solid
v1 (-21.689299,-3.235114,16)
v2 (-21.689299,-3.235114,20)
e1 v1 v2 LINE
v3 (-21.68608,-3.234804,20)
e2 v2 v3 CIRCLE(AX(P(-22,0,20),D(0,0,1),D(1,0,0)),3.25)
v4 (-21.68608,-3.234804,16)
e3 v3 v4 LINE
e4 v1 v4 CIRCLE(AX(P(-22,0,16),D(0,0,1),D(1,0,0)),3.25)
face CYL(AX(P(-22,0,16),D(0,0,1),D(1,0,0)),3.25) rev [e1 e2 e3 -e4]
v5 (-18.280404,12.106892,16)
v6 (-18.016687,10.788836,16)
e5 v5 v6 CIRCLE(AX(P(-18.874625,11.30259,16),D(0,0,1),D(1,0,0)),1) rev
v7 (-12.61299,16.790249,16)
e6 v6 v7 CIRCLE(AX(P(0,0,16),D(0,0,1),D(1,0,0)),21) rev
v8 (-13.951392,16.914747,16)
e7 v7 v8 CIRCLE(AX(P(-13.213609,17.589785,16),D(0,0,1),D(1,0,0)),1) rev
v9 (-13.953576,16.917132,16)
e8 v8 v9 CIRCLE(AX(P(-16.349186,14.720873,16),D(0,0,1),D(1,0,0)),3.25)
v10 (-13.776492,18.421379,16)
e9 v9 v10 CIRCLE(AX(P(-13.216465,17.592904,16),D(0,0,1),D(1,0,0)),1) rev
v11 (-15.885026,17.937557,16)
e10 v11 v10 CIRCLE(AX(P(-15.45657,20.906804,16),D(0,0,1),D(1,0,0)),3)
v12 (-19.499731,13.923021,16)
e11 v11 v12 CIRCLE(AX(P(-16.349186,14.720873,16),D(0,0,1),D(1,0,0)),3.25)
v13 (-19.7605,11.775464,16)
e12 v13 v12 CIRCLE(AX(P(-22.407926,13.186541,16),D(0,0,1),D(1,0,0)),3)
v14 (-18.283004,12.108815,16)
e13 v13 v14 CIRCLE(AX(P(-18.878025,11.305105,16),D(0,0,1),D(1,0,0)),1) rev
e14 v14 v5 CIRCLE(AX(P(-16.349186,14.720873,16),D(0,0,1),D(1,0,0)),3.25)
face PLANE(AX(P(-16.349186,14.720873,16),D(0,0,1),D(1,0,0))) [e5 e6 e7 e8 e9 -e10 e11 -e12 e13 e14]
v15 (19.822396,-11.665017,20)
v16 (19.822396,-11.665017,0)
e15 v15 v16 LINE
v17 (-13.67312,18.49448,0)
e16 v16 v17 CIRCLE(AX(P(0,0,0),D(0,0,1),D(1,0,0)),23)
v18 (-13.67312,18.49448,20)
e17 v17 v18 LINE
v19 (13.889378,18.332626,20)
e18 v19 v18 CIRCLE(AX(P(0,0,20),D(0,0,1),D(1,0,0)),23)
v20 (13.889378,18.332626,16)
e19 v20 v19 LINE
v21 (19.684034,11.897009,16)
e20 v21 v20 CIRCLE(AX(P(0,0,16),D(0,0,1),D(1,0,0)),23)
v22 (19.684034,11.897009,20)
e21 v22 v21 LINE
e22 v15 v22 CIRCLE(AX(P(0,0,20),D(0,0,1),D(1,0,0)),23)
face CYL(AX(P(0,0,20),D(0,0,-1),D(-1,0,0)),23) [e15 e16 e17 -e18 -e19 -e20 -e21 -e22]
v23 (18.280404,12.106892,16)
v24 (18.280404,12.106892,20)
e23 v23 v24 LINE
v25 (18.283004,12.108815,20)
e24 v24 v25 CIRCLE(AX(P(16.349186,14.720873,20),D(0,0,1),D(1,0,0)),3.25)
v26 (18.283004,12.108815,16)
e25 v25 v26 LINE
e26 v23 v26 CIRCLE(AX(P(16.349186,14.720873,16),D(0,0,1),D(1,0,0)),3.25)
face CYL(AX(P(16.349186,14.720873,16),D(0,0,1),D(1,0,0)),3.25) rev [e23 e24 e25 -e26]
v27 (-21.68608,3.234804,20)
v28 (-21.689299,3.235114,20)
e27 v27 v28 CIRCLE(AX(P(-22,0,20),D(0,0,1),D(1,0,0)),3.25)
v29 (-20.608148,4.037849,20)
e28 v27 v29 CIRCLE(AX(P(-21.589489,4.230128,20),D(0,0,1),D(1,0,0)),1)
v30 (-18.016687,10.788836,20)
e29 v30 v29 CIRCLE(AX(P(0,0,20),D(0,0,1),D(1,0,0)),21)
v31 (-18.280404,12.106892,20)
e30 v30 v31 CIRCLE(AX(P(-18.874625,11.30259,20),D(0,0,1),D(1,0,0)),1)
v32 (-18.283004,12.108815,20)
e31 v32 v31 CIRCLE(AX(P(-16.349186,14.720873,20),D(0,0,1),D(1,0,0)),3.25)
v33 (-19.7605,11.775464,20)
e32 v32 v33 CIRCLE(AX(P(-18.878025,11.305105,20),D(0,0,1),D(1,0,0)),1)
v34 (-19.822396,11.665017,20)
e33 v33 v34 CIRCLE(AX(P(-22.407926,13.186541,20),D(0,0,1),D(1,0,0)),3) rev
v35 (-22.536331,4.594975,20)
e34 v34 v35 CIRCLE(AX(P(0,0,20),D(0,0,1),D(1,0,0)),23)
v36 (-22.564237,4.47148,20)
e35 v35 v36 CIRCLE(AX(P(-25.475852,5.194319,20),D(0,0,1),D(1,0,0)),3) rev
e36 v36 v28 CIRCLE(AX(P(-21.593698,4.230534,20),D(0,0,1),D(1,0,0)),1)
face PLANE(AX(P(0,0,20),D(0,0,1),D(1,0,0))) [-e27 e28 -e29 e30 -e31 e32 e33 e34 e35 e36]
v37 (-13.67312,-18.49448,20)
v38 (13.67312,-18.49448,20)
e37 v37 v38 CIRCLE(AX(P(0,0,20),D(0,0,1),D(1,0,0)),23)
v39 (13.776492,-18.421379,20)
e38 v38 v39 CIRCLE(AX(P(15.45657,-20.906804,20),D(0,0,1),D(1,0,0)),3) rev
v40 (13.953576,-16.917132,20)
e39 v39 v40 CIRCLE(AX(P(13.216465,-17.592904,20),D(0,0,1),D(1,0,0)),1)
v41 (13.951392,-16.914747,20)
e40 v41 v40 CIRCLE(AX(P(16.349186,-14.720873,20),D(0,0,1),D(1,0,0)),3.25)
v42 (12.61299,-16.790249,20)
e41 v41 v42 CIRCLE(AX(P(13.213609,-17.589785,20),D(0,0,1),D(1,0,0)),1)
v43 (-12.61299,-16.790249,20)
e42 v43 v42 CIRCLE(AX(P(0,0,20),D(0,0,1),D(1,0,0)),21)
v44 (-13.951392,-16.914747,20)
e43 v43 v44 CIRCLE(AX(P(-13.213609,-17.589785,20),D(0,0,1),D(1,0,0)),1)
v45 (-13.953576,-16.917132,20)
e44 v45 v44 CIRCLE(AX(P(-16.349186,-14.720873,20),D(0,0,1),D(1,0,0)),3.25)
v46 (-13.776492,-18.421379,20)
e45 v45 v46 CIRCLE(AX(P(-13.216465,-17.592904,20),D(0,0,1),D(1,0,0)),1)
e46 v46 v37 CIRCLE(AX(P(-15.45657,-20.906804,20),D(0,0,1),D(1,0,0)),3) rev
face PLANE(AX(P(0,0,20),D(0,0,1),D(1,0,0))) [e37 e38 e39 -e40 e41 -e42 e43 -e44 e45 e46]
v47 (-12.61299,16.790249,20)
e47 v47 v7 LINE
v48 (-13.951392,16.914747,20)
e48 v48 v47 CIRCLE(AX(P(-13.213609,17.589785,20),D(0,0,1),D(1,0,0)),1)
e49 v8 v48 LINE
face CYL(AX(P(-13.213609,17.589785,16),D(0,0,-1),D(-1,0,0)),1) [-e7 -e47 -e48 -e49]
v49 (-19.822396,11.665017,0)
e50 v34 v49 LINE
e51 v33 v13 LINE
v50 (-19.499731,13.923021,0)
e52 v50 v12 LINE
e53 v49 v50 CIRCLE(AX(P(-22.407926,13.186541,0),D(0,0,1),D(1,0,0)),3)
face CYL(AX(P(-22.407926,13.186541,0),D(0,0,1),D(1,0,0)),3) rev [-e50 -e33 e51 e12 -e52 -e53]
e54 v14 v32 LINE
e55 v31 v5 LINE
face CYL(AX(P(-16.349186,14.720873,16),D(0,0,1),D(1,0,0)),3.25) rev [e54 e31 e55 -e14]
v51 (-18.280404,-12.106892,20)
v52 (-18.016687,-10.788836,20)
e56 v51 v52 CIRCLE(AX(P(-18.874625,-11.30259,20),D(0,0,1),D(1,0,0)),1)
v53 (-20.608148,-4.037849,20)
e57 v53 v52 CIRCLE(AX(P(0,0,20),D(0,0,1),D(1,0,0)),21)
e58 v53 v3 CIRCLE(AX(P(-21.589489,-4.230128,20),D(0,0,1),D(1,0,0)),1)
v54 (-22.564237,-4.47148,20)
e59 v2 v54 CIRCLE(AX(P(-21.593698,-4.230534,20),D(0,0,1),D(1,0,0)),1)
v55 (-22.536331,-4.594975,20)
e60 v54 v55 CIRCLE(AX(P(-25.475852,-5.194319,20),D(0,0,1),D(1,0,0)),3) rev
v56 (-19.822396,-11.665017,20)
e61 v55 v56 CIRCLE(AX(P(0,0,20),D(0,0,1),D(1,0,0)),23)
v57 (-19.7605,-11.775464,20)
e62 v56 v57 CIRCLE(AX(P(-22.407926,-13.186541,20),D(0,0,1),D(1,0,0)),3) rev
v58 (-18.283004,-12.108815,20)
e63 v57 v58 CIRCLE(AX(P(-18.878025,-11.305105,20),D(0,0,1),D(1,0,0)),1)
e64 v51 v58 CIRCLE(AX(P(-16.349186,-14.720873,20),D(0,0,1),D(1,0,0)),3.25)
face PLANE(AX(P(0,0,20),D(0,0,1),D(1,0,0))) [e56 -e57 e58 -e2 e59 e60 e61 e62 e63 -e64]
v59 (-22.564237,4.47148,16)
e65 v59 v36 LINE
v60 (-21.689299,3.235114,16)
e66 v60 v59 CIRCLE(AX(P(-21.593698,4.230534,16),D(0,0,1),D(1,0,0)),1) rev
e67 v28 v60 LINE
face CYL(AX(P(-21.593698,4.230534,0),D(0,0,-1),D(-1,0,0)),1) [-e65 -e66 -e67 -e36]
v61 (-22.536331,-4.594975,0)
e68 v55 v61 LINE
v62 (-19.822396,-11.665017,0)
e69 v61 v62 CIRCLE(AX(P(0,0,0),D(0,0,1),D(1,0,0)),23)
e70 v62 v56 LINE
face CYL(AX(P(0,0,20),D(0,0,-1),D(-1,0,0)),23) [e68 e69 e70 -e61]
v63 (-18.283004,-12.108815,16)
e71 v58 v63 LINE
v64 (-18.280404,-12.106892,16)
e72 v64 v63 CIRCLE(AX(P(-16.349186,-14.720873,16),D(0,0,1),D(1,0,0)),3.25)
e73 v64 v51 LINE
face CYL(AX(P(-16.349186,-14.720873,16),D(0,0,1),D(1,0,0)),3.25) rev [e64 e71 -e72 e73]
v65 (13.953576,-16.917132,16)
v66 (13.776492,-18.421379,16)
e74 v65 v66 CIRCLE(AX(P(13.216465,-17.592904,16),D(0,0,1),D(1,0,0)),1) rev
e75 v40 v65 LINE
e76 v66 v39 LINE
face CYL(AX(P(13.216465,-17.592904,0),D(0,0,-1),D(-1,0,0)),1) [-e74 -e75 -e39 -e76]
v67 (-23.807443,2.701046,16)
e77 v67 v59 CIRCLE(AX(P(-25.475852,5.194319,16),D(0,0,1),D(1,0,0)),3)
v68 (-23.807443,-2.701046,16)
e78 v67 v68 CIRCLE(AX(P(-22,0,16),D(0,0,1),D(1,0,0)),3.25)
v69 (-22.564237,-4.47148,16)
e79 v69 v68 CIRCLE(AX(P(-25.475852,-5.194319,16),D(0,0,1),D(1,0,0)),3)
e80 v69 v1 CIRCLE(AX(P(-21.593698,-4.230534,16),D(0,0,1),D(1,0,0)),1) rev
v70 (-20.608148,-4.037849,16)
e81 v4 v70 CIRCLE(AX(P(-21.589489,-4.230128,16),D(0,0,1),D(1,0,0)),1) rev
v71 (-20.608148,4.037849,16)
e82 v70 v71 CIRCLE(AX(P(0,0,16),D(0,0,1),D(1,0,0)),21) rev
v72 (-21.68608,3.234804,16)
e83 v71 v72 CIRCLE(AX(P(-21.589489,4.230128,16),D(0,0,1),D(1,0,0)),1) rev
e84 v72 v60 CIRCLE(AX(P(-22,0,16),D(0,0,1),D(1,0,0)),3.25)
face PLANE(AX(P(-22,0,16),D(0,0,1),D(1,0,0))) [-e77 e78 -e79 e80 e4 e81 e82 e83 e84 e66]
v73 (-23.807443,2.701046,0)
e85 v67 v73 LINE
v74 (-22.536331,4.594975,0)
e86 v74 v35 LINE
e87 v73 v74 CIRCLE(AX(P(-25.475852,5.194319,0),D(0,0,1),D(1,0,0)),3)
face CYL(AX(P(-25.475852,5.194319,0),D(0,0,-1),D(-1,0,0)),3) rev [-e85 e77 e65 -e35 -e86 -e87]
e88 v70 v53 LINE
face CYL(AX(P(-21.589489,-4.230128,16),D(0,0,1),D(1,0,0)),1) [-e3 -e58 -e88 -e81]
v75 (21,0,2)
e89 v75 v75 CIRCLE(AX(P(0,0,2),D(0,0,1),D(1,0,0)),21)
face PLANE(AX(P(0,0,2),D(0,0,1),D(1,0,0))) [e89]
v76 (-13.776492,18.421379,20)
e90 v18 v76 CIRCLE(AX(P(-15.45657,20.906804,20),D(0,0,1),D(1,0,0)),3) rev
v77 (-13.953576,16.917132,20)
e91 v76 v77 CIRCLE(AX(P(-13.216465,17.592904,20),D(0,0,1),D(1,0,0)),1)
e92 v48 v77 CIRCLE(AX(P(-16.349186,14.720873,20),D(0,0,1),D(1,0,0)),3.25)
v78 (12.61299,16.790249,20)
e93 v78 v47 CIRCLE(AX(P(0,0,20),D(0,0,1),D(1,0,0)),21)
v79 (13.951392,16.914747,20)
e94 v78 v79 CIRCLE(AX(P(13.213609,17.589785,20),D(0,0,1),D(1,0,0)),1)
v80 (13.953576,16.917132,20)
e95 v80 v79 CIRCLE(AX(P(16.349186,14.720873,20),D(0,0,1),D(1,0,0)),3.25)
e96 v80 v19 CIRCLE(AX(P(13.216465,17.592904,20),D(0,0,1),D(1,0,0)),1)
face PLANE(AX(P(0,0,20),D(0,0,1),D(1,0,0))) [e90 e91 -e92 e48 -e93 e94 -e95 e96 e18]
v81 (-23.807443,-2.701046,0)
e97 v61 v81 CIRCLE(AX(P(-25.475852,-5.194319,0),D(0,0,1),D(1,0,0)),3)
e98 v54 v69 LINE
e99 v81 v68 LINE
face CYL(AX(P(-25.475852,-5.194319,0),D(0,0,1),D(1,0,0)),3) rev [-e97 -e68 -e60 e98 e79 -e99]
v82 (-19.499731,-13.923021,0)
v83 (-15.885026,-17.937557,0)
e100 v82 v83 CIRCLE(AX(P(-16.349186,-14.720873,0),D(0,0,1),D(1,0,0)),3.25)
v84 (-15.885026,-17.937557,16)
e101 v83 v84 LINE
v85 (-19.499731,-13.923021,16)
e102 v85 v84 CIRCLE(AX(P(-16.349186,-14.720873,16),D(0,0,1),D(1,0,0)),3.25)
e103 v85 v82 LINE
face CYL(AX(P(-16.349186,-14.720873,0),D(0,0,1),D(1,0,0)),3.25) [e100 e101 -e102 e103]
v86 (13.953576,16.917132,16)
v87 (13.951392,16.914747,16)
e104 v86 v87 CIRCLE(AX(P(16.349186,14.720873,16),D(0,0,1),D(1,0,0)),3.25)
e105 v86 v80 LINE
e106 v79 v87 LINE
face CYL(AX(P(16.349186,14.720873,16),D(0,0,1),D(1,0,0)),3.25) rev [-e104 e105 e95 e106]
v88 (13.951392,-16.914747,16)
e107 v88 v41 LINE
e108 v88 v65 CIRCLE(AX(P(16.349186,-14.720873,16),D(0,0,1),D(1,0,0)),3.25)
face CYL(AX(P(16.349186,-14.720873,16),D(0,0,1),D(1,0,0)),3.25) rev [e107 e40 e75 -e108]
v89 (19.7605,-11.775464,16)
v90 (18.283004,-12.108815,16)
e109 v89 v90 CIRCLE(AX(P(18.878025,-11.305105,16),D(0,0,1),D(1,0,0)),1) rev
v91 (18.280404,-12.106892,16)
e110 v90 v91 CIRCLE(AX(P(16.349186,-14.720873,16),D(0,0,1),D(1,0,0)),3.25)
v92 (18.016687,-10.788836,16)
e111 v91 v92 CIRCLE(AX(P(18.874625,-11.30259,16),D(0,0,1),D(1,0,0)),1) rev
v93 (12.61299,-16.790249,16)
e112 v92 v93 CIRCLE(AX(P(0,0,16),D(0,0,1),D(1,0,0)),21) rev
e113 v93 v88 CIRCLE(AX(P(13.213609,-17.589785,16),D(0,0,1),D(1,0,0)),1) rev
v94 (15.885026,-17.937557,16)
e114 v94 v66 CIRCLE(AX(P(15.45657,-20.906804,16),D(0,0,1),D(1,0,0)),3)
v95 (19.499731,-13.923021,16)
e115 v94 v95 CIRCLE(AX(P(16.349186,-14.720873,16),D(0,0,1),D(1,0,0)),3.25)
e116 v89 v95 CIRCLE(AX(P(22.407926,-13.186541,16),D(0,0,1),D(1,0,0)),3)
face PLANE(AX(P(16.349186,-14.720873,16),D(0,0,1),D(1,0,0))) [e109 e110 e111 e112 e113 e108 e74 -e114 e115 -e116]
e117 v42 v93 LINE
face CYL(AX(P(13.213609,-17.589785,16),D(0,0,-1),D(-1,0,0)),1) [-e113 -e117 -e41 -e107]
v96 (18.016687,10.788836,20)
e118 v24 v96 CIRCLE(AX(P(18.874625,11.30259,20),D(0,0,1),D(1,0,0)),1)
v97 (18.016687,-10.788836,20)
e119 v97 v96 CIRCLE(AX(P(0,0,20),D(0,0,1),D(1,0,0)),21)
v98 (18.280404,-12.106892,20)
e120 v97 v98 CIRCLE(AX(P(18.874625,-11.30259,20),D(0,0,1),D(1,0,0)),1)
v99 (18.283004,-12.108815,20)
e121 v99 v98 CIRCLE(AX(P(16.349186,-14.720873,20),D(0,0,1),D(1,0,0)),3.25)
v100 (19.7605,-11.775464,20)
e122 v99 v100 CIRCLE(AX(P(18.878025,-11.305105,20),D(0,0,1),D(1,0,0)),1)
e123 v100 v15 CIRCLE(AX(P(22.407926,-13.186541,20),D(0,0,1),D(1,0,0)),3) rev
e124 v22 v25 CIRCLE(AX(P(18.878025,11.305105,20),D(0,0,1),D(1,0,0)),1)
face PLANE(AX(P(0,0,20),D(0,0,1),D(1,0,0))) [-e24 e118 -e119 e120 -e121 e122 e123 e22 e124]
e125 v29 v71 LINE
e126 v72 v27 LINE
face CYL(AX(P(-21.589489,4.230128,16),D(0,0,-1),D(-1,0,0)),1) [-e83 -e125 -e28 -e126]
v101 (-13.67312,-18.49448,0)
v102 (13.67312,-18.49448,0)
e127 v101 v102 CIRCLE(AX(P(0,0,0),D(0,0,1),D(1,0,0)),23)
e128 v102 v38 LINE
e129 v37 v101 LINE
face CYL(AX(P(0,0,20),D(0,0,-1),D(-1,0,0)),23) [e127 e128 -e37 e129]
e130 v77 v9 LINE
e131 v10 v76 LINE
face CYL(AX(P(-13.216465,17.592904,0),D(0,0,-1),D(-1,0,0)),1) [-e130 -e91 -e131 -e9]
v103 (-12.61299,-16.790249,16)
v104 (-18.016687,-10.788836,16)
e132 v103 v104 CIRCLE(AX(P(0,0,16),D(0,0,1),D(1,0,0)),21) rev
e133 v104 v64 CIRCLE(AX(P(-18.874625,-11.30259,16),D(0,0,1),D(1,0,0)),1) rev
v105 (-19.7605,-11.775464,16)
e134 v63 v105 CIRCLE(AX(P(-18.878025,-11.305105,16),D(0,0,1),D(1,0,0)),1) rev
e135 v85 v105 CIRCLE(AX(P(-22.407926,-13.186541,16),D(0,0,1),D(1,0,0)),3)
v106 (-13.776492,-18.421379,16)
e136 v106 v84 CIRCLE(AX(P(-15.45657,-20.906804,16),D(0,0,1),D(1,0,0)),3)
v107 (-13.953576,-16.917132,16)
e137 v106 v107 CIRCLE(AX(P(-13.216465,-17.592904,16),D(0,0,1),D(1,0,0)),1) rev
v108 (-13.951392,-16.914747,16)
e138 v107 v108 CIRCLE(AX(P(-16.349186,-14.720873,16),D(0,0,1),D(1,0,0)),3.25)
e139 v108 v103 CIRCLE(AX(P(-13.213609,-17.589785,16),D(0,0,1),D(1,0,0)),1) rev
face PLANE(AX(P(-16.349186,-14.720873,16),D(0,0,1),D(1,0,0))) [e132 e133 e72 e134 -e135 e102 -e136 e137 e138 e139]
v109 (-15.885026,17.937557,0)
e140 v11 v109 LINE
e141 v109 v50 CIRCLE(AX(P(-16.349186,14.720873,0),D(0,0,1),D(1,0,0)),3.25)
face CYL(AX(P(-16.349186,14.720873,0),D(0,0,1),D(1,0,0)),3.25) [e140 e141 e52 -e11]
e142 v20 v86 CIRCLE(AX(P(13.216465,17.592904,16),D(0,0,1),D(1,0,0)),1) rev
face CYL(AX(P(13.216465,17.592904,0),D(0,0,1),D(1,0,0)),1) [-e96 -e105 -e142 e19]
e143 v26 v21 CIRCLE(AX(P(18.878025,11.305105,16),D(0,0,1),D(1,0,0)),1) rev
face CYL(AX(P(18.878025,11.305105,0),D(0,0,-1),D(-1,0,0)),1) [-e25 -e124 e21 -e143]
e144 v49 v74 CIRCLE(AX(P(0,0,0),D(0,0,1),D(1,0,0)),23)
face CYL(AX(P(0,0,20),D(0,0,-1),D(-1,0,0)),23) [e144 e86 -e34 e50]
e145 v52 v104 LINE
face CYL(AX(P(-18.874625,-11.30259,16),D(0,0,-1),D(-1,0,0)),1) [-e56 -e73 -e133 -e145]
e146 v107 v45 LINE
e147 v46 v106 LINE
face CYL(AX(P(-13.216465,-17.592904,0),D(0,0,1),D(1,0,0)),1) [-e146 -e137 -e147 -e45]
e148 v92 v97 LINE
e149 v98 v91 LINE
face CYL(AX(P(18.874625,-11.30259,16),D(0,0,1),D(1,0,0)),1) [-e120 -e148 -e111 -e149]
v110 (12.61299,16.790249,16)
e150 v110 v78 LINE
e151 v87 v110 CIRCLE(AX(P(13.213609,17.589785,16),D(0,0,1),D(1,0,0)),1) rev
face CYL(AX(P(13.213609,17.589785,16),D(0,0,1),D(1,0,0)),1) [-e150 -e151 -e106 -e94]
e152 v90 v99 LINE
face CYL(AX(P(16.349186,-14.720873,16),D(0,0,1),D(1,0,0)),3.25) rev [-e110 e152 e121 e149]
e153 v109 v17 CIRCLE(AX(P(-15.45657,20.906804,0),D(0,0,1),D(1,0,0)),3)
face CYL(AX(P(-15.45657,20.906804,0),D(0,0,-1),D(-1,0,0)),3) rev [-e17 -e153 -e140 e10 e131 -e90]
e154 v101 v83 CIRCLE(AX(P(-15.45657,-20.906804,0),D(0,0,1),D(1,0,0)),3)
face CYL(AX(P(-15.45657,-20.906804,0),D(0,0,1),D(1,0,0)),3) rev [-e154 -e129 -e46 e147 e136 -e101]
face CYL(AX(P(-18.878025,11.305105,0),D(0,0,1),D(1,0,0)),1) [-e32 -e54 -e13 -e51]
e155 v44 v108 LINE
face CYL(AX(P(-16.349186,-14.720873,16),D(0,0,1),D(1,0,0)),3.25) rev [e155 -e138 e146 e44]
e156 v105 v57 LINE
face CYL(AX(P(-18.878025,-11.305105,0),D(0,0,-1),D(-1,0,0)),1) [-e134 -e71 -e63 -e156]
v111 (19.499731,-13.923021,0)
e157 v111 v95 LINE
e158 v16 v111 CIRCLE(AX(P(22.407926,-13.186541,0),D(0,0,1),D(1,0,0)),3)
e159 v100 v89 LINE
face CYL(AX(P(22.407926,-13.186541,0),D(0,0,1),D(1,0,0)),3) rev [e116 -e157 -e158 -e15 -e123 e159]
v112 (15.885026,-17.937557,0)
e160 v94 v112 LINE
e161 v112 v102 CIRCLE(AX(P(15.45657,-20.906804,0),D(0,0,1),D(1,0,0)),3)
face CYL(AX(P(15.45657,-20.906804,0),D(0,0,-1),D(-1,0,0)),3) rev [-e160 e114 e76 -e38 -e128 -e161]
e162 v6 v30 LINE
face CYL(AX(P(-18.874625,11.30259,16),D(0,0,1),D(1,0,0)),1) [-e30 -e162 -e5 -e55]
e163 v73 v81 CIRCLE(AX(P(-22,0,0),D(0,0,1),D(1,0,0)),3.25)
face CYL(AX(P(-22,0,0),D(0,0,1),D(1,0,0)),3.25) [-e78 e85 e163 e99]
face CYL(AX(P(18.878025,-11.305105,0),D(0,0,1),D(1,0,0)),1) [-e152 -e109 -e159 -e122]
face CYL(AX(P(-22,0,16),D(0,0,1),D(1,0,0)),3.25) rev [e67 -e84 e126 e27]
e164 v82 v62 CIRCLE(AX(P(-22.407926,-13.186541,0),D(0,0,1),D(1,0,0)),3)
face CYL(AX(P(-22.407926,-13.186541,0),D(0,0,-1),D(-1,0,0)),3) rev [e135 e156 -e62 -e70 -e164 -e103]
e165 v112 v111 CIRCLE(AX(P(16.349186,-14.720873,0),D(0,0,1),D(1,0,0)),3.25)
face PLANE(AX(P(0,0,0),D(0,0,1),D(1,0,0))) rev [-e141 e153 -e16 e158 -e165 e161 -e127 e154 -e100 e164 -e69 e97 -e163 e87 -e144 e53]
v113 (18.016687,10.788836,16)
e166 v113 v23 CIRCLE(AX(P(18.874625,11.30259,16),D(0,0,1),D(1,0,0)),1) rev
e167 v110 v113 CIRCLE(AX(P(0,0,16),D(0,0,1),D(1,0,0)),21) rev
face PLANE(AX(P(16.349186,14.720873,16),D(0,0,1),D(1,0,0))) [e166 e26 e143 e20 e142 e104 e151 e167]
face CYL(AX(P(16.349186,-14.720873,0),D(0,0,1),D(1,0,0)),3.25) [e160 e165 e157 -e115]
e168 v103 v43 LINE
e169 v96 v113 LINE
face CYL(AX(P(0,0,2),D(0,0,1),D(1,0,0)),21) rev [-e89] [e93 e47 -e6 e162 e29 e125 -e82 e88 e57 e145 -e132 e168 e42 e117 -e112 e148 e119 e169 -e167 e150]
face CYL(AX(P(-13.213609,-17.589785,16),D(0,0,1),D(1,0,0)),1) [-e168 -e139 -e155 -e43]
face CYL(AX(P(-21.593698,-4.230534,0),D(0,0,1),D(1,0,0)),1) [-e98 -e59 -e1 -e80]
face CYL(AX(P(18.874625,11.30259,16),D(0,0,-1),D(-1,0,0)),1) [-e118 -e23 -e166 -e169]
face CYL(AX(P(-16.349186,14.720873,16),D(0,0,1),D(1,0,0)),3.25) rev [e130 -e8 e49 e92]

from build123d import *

# Parameters (mm, degrees)
SKETCH_1_R          = 23
EXTRUDE_1_DEPTH     = 20
SKETCH_2_R          = 21
CUT_EXTRUDE_1_DEPTH = 18
EXTRUDE_START       = -20
EXTRUDE_2_DEPTH     = 20
FILLET_1_R          = 3
SKETCH_6_R          = 21
CUT_EXTRUDE_2_DEPTH = 18
CUT_EXTRUDE_START   = -4
SKETCH_7_R          = 3.25
CUT_EXTRUDE_3_DEPTH = 4
FILLET_START        = 16
FILLET_2_DEPTH      = 4
CUT_EXTRUDE_4_REACH = 41.58


with BuildPart() as part:
    # Эскиз1 → Бобышка-Вытянуть1 (new body)
    with BuildSketch(Plane.XY):
        Circle(SKETCH_1_R)
    extrude(amount=EXTRUDE_1_DEPTH)

    # Эскиз2 → Вырез-Вытянуть1 (cut)
    with BuildSketch(Plane.XY.offset(20)):
        Circle(SKETCH_2_R)
    extrude(amount=-CUT_EXTRUDE_1_DEPTH, mode=Mode.SUBTRACT)

    # Эскиз5 → Бобышка-Вытянуть2 (add)
    with BuildSketch(Plane.XY.offset(20).offset(EXTRUDE_START)):
        with BuildLine():
            ThreePointArc((-13.428172595, 16.145717103), (-18.764406843, 16.895547811), (-17.460895421, 11.666924663))
            ThreePointArc((-17.460895421, 11.666924663), (-19.605188956, 7.52572694), (-20.782670455, 3.013404848))
            ThreePointArc((-20.782670455, 3.013404848), (-25.25, 0), (-20.782670455, -3.013404848))
            ThreePointArc((-20.782670455, -3.013404848), (-19.605188956, -7.52572694), (-17.460895421, -11.666924663))
            ThreePointArc((-17.460895421, -11.666924663), (-18.764406843, -16.895547811), (-13.428172595, -16.145717103))
            ThreePointArc((-13.428172595, -16.145717103), (0, -21), (13.428172595, -16.145717103))
            ThreePointArc((13.428172595, -16.145717103), (18.764406843, -16.895547811), (17.460895421, -11.666924663))
            ThreePointArc((17.460895421, -11.666924663), (21, 0), (17.460895421, 11.666924663))
            ThreePointArc((17.460895421, 11.666924663), (18.764406843, 16.895547811), (13.428172595, 16.145717103))
            ThreePointArc((13.428172595, 16.145717103), (0, 21), (-13.428172595, 16.145717103))
        make_face()
    extrude(amount=EXTRUDE_2_DEPTH)

    # Скругление1
    fillet_1_edges = [part.edges().sort_by_distance(p)[0] for p in [
        (19.041496109, 12.900442858, 10),
        (14.820151209, -17.588721334, 10),
        (-19.041496109, -12.900442858, 10),
        (-22.782670455, 3.154350481, 10),
        (-14.820151209, 17.588721334, 10),
        (14.820151209, 17.588721334, 10),
        (19.041496109, -12.900442858, 10),
        (-14.820151209, -17.588721334, 10),
        (-22.782670455, -3.154350481, 10),
        (-19.041496109, 12.900442858, 10),
    ]]
    fillet(fillet_1_edges, radius=FILLET_1_R)

    # Эскиз6 → Вырез-Вытянуть2 (cut)
    with BuildSketch(Plane.XY.offset(20)):
        Circle(SKETCH_6_R)
    extrude(amount=-CUT_EXTRUDE_2_DEPTH, mode=Mode.SUBTRACT)

    # Эскиз7 → Вырез-Вытянуть3 (cut)
    with BuildSketch(Plane.XY.offset(20).offset(CUT_EXTRUDE_START)):
        with Locations((-16.349186161, 14.72087334)):
            Circle(SKETCH_7_R)
        with Locations((16.349186161, 14.72087334)):
            Circle(SKETCH_7_R)
        with Locations((-16.349186161, -14.72087334)):
            Circle(SKETCH_7_R)
        with Locations((-22, 0)):
            Circle(SKETCH_7_R)
        with Locations((16.349186161, -14.72087334)):
            Circle(SKETCH_7_R)
    extrude(amount=CUT_EXTRUDE_3_DEPTH, mode=Mode.SUBTRACT)

    # Скругление2: read off the stored shape, not the designer's step
    # Скругление2 outline → Скругление2 (cut)
    with BuildSketch(Plane.XY.offset(FILLET_START)):
        with BuildLine():
            ThreePointArc((-13.776491508, -18.421379011), (-14.209607213, -17.709819826), (-13.95357615, -16.917132131))
            ThreePointArc((-13.95357615, -16.917132131), (-14.831000199, -17.59447933), (-15.885025704, -17.937557202))
            ThreePointArc((-15.885025704, -17.937557202), (-14.785629767, -17.982793014), (-13.776491508, -18.421379011))
        make_face()
        with BuildLine():
            ThreePointArc((-19.499730713, -13.923020582), (-19.048356591, -12.910630542), (-18.283004183, -12.108815175))
            ThreePointArc((-18.283004183, -12.108815175), (-19.098111986, -12.280585247), (-19.760500256, -11.775464006))
            ThreePointArc((-19.760500256, -11.775464006), (-19.42980055, -12.824918821), (-19.499730713, -13.923020582))
        make_face()
        with BuildLine():
            ThreePointArc((-22.564236885, -4.471480374), (-22.409978551, -3.652877874), (-21.689298793, -3.235114335))
            ThreePointArc((-21.689298793, -3.235114335), (-22.794585678, -3.151370115), (-23.807443182, -2.701045935))
            ThreePointArc((-23.807443182, -2.701045935), (-23.020701446, -3.470302164), (-22.564236885, -4.471480374))
        make_face()
        with BuildLine():
            ThreePointArc((-23.807443182, 2.701045935), (-22.794585678, 3.151370115), (-21.689298793, 3.235114335))
            ThreePointArc((-21.689298793, 3.235114335), (-22.409978551, 3.652877874), (-22.564236885, 4.471480374))
            ThreePointArc((-22.564236885, 4.471480374), (-23.020701446, 3.470302164), (-23.807443182, 2.701045935))
        make_face()
        with BuildLine():
            ThreePointArc((-19.760500256, 11.775464006), (-19.098111986, 12.280585247), (-18.283004183, 12.108815175))
            ThreePointArc((-18.283004183, 12.108815175), (-19.048356591, 12.910630542), (-19.499730713, 13.923020582))
            ThreePointArc((-19.499730713, 13.923020582), (-19.42980055, 12.824918821), (-19.760500256, 11.775464006))
        make_face()
        with BuildLine():
            ThreePointArc((-15.885025704, 17.937557202), (-14.831000199, 17.59447933), (-13.95357615, 16.917132131))
            ThreePointArc((-13.95357615, 16.917132131), (-14.209607213, 17.709819826), (-13.776491508, 18.421379011))
            ThreePointArc((-13.776491508, 18.421379011), (-14.785629767, 17.982793014), (-15.885025704, 17.937557202))
        make_face()
        with BuildLine():
            ThreePointArc((13.776491508, 18.421379011), (14.209607213, 17.709819826), (13.95357615, 16.917132131))
            ThreePointArc((13.95357615, 16.917132131), (14.831000199, 17.59447933), (15.885025704, 17.937557202))
            ThreePointArc((15.885025704, 17.937557202), (14.785629767, 17.982793014), (13.776491508, 18.421379011))
        make_face()
        with BuildLine():
            ThreePointArc((19.499730713, 13.923020582), (19.048356591, 12.910630542), (18.283004183, 12.108815175))
            ThreePointArc((18.283004183, 12.108815175), (19.098111986, 12.280585247), (19.760500256, 11.775464006))
            ThreePointArc((19.760500256, 11.775464006), (19.42980055, 12.824918821), (19.499730713, 13.923020582))
        make_face()
        with BuildLine():
            ThreePointArc((19.760500256, -11.775464006), (19.098111986, -12.280585247), (18.283004183, -12.108815175))
            ThreePointArc((18.283004183, -12.108815175), (19.048356591, -12.910630542), (19.499730713, -13.923020582))
            ThreePointArc((19.499730713, -13.923020582), (19.42980055, -12.824918821), (19.760500256, -11.775464006))
        make_face()
        with BuildLine():
            ThreePointArc((15.885025704, -17.937557202), (14.831000199, -17.59447933), (13.95357615, -16.917132131))
            ThreePointArc((13.95357615, -16.917132131), (14.209607213, -17.709819826), (13.776491508, -18.421379011))
            ThreePointArc((13.776491508, -18.421379011), (14.785629767, -17.982793014), (15.885025704, -17.937557202))
        make_face()
        with BuildLine():
            ThreePointArc((-13.951391744, -16.914747069), (-13.306228642, -16.594083591), (-12.612990263, -16.790249451))
            ThreePointArc((-12.612990263, -16.790249451), (-13.024568946, -16.473026551), (-13.428172595, -16.145717103))
            ThreePointArc((-13.428172595, -16.145717103), (-13.662128037, -16.549046921), (-13.951391744, -16.914747069))
        make_face()
        with BuildLine():
            ThreePointArc((13.428172595, -16.145717103), (13.024568946, -16.473026551), (12.612990263, -16.790249451))
            ThreePointArc((12.612990263, -16.790249451), (13.306228642, -16.594083591), (13.951391744, -16.914747069))
            ThreePointArc((13.951391744, -16.914747069), (13.662128037, -16.549046921), (13.428172595, -16.145717103))
        make_face()
        with BuildLine():
            ThreePointArc((-18.280403854, -12.106892043), (-17.886470759, -11.857439027), (-17.460895421, -11.666924663))
            ThreePointArc((-17.460895421, -11.666924663), (-17.744223765, -11.231318844), (-18.016687197, -10.78883601))
            ThreePointArc((-18.016687197, -10.78883601), (-17.894059096, -11.498781672), (-18.280403854, -12.106892043))
        make_face()
        with BuildLine():
            ThreePointArc((18.016687197, -10.78883601), (17.744223765, -11.231318844), (17.460895421, -11.666924663))
            ThreePointArc((17.460895421, -11.666924663), (17.886470759, -11.857439027), (18.280403854, -12.106892043))
            ThreePointArc((18.280403854, -12.106892043), (17.894059096, -11.498781672), (18.016687197, -10.78883601))
        make_face()
        with BuildLine():
            ThreePointArc((-21.686079545, -3.234803541), (-20.992064177, -3.428202514), (-20.608148244, -4.037849175))
            ThreePointArc((-20.608148244, -4.037849175), (-20.701747261, -3.526706725), (-20.782670455, -3.013404848))
            ThreePointArc((-20.782670455, -3.013404848), (-21.226413556, -3.156590568), (-21.686079545, -3.234803541))
        make_face()
        with BuildLine():
            ThreePointArc((-21.686079545, 3.234803541), (-21.226413556, 3.156590568), (-20.782670455, 3.013404848))
            ThreePointArc((-20.782670455, 3.013404848), (-20.701747261, 3.526706725), (-20.608148244, 4.037849175))
            ThreePointArc((-20.608148244, 4.037849175), (-20.992064177, 3.428202514), (-21.686079545, 3.234803541))
        make_face()
        with BuildLine():
            ThreePointArc((17.460895421, 11.666924663), (17.744223765, 11.231318844), (18.016687197, 10.78883601))
            ThreePointArc((18.016687197, 10.78883601), (17.894059096, 11.498781672), (18.280403854, 12.106892043))
            ThreePointArc((18.280403854, 12.106892043), (17.886470759, 11.857439027), (17.460895421, 11.666924663))
        make_face()
        with BuildLine():
            ThreePointArc((-18.280403854, 12.106892043), (-17.894059096, 11.498781672), (-18.016687197, 10.78883601))
            ThreePointArc((-18.016687197, 10.78883601), (-17.744223765, 11.231318844), (-17.460895421, 11.666924663))
            ThreePointArc((-17.460895421, 11.666924663), (-17.886470759, 11.857439027), (-18.280403854, 12.106892043))
        make_face()
        with BuildLine():
            ThreePointArc((12.612990263, 16.790249451), (13.024568946, 16.473026551), (13.428172595, 16.145717103))
            ThreePointArc((13.428172595, 16.145717103), (13.662128037, 16.549046921), (13.951391744, 16.914747069))
            ThreePointArc((13.951391744, 16.914747069), (13.306228642, 16.594083591), (12.612990263, 16.790249451))
        make_face()
        with BuildLine():
            ThreePointArc((-13.951391744, 16.914747069), (-13.662128037, 16.549046921), (-13.428172595, 16.145717103))
            ThreePointArc((-13.428172595, 16.145717103), (-13.024568946, 16.473026551), (-12.612990263, 16.790249451))
            ThreePointArc((-12.612990263, 16.790249451), (-13.306228642, 16.594083591), (-13.951391744, 16.914747069))
        make_face()
    extrude(amount=FILLET_2_DEPTH, mode=Mode.SUBTRACT)

    # Эскиз8 → Вырез-Вытянуть4 (cut, up to next)
    with BuildSketch(Plane(origin=(0, 0, 0), x_dir=(-1, 0, 0), z_dir=(0, 0, -1)), mode=Mode.PRIVATE) as cut_extrude_4_sk1:
        with BuildLine():
            ThreePointArc((-15.885025704, 17.937557202), (-18.764406843, 16.895547811), (-19.499730713, 13.923020582))
            ThreePointArc((-19.499730713, 13.923020582), (-19.438094361, 12.762156961), (-19.822395798, 11.665017138))
            ThreePointArc((-19.822395798, 11.665017138), (-17.092330986, 15.390003946), (-13.673119525, 18.494480324))
            ThreePointArc((-13.673119525, 18.494480324), (-14.724078663, 17.997601791), (-15.885025704, 17.937557202))
        make_face()
    cut_extrude_4_tool1 = extrude(cut_extrude_4_sk1.sketch, amount=-CUT_EXTRUDE_4_REACH, mode=Mode.PRIVATE) & part.part
    add(cut_extrude_4_tool1.solids().sort_by_distance((17.719386, 15.954607, 0))[0], mode=Mode.SUBTRACT)


solid = part.part
